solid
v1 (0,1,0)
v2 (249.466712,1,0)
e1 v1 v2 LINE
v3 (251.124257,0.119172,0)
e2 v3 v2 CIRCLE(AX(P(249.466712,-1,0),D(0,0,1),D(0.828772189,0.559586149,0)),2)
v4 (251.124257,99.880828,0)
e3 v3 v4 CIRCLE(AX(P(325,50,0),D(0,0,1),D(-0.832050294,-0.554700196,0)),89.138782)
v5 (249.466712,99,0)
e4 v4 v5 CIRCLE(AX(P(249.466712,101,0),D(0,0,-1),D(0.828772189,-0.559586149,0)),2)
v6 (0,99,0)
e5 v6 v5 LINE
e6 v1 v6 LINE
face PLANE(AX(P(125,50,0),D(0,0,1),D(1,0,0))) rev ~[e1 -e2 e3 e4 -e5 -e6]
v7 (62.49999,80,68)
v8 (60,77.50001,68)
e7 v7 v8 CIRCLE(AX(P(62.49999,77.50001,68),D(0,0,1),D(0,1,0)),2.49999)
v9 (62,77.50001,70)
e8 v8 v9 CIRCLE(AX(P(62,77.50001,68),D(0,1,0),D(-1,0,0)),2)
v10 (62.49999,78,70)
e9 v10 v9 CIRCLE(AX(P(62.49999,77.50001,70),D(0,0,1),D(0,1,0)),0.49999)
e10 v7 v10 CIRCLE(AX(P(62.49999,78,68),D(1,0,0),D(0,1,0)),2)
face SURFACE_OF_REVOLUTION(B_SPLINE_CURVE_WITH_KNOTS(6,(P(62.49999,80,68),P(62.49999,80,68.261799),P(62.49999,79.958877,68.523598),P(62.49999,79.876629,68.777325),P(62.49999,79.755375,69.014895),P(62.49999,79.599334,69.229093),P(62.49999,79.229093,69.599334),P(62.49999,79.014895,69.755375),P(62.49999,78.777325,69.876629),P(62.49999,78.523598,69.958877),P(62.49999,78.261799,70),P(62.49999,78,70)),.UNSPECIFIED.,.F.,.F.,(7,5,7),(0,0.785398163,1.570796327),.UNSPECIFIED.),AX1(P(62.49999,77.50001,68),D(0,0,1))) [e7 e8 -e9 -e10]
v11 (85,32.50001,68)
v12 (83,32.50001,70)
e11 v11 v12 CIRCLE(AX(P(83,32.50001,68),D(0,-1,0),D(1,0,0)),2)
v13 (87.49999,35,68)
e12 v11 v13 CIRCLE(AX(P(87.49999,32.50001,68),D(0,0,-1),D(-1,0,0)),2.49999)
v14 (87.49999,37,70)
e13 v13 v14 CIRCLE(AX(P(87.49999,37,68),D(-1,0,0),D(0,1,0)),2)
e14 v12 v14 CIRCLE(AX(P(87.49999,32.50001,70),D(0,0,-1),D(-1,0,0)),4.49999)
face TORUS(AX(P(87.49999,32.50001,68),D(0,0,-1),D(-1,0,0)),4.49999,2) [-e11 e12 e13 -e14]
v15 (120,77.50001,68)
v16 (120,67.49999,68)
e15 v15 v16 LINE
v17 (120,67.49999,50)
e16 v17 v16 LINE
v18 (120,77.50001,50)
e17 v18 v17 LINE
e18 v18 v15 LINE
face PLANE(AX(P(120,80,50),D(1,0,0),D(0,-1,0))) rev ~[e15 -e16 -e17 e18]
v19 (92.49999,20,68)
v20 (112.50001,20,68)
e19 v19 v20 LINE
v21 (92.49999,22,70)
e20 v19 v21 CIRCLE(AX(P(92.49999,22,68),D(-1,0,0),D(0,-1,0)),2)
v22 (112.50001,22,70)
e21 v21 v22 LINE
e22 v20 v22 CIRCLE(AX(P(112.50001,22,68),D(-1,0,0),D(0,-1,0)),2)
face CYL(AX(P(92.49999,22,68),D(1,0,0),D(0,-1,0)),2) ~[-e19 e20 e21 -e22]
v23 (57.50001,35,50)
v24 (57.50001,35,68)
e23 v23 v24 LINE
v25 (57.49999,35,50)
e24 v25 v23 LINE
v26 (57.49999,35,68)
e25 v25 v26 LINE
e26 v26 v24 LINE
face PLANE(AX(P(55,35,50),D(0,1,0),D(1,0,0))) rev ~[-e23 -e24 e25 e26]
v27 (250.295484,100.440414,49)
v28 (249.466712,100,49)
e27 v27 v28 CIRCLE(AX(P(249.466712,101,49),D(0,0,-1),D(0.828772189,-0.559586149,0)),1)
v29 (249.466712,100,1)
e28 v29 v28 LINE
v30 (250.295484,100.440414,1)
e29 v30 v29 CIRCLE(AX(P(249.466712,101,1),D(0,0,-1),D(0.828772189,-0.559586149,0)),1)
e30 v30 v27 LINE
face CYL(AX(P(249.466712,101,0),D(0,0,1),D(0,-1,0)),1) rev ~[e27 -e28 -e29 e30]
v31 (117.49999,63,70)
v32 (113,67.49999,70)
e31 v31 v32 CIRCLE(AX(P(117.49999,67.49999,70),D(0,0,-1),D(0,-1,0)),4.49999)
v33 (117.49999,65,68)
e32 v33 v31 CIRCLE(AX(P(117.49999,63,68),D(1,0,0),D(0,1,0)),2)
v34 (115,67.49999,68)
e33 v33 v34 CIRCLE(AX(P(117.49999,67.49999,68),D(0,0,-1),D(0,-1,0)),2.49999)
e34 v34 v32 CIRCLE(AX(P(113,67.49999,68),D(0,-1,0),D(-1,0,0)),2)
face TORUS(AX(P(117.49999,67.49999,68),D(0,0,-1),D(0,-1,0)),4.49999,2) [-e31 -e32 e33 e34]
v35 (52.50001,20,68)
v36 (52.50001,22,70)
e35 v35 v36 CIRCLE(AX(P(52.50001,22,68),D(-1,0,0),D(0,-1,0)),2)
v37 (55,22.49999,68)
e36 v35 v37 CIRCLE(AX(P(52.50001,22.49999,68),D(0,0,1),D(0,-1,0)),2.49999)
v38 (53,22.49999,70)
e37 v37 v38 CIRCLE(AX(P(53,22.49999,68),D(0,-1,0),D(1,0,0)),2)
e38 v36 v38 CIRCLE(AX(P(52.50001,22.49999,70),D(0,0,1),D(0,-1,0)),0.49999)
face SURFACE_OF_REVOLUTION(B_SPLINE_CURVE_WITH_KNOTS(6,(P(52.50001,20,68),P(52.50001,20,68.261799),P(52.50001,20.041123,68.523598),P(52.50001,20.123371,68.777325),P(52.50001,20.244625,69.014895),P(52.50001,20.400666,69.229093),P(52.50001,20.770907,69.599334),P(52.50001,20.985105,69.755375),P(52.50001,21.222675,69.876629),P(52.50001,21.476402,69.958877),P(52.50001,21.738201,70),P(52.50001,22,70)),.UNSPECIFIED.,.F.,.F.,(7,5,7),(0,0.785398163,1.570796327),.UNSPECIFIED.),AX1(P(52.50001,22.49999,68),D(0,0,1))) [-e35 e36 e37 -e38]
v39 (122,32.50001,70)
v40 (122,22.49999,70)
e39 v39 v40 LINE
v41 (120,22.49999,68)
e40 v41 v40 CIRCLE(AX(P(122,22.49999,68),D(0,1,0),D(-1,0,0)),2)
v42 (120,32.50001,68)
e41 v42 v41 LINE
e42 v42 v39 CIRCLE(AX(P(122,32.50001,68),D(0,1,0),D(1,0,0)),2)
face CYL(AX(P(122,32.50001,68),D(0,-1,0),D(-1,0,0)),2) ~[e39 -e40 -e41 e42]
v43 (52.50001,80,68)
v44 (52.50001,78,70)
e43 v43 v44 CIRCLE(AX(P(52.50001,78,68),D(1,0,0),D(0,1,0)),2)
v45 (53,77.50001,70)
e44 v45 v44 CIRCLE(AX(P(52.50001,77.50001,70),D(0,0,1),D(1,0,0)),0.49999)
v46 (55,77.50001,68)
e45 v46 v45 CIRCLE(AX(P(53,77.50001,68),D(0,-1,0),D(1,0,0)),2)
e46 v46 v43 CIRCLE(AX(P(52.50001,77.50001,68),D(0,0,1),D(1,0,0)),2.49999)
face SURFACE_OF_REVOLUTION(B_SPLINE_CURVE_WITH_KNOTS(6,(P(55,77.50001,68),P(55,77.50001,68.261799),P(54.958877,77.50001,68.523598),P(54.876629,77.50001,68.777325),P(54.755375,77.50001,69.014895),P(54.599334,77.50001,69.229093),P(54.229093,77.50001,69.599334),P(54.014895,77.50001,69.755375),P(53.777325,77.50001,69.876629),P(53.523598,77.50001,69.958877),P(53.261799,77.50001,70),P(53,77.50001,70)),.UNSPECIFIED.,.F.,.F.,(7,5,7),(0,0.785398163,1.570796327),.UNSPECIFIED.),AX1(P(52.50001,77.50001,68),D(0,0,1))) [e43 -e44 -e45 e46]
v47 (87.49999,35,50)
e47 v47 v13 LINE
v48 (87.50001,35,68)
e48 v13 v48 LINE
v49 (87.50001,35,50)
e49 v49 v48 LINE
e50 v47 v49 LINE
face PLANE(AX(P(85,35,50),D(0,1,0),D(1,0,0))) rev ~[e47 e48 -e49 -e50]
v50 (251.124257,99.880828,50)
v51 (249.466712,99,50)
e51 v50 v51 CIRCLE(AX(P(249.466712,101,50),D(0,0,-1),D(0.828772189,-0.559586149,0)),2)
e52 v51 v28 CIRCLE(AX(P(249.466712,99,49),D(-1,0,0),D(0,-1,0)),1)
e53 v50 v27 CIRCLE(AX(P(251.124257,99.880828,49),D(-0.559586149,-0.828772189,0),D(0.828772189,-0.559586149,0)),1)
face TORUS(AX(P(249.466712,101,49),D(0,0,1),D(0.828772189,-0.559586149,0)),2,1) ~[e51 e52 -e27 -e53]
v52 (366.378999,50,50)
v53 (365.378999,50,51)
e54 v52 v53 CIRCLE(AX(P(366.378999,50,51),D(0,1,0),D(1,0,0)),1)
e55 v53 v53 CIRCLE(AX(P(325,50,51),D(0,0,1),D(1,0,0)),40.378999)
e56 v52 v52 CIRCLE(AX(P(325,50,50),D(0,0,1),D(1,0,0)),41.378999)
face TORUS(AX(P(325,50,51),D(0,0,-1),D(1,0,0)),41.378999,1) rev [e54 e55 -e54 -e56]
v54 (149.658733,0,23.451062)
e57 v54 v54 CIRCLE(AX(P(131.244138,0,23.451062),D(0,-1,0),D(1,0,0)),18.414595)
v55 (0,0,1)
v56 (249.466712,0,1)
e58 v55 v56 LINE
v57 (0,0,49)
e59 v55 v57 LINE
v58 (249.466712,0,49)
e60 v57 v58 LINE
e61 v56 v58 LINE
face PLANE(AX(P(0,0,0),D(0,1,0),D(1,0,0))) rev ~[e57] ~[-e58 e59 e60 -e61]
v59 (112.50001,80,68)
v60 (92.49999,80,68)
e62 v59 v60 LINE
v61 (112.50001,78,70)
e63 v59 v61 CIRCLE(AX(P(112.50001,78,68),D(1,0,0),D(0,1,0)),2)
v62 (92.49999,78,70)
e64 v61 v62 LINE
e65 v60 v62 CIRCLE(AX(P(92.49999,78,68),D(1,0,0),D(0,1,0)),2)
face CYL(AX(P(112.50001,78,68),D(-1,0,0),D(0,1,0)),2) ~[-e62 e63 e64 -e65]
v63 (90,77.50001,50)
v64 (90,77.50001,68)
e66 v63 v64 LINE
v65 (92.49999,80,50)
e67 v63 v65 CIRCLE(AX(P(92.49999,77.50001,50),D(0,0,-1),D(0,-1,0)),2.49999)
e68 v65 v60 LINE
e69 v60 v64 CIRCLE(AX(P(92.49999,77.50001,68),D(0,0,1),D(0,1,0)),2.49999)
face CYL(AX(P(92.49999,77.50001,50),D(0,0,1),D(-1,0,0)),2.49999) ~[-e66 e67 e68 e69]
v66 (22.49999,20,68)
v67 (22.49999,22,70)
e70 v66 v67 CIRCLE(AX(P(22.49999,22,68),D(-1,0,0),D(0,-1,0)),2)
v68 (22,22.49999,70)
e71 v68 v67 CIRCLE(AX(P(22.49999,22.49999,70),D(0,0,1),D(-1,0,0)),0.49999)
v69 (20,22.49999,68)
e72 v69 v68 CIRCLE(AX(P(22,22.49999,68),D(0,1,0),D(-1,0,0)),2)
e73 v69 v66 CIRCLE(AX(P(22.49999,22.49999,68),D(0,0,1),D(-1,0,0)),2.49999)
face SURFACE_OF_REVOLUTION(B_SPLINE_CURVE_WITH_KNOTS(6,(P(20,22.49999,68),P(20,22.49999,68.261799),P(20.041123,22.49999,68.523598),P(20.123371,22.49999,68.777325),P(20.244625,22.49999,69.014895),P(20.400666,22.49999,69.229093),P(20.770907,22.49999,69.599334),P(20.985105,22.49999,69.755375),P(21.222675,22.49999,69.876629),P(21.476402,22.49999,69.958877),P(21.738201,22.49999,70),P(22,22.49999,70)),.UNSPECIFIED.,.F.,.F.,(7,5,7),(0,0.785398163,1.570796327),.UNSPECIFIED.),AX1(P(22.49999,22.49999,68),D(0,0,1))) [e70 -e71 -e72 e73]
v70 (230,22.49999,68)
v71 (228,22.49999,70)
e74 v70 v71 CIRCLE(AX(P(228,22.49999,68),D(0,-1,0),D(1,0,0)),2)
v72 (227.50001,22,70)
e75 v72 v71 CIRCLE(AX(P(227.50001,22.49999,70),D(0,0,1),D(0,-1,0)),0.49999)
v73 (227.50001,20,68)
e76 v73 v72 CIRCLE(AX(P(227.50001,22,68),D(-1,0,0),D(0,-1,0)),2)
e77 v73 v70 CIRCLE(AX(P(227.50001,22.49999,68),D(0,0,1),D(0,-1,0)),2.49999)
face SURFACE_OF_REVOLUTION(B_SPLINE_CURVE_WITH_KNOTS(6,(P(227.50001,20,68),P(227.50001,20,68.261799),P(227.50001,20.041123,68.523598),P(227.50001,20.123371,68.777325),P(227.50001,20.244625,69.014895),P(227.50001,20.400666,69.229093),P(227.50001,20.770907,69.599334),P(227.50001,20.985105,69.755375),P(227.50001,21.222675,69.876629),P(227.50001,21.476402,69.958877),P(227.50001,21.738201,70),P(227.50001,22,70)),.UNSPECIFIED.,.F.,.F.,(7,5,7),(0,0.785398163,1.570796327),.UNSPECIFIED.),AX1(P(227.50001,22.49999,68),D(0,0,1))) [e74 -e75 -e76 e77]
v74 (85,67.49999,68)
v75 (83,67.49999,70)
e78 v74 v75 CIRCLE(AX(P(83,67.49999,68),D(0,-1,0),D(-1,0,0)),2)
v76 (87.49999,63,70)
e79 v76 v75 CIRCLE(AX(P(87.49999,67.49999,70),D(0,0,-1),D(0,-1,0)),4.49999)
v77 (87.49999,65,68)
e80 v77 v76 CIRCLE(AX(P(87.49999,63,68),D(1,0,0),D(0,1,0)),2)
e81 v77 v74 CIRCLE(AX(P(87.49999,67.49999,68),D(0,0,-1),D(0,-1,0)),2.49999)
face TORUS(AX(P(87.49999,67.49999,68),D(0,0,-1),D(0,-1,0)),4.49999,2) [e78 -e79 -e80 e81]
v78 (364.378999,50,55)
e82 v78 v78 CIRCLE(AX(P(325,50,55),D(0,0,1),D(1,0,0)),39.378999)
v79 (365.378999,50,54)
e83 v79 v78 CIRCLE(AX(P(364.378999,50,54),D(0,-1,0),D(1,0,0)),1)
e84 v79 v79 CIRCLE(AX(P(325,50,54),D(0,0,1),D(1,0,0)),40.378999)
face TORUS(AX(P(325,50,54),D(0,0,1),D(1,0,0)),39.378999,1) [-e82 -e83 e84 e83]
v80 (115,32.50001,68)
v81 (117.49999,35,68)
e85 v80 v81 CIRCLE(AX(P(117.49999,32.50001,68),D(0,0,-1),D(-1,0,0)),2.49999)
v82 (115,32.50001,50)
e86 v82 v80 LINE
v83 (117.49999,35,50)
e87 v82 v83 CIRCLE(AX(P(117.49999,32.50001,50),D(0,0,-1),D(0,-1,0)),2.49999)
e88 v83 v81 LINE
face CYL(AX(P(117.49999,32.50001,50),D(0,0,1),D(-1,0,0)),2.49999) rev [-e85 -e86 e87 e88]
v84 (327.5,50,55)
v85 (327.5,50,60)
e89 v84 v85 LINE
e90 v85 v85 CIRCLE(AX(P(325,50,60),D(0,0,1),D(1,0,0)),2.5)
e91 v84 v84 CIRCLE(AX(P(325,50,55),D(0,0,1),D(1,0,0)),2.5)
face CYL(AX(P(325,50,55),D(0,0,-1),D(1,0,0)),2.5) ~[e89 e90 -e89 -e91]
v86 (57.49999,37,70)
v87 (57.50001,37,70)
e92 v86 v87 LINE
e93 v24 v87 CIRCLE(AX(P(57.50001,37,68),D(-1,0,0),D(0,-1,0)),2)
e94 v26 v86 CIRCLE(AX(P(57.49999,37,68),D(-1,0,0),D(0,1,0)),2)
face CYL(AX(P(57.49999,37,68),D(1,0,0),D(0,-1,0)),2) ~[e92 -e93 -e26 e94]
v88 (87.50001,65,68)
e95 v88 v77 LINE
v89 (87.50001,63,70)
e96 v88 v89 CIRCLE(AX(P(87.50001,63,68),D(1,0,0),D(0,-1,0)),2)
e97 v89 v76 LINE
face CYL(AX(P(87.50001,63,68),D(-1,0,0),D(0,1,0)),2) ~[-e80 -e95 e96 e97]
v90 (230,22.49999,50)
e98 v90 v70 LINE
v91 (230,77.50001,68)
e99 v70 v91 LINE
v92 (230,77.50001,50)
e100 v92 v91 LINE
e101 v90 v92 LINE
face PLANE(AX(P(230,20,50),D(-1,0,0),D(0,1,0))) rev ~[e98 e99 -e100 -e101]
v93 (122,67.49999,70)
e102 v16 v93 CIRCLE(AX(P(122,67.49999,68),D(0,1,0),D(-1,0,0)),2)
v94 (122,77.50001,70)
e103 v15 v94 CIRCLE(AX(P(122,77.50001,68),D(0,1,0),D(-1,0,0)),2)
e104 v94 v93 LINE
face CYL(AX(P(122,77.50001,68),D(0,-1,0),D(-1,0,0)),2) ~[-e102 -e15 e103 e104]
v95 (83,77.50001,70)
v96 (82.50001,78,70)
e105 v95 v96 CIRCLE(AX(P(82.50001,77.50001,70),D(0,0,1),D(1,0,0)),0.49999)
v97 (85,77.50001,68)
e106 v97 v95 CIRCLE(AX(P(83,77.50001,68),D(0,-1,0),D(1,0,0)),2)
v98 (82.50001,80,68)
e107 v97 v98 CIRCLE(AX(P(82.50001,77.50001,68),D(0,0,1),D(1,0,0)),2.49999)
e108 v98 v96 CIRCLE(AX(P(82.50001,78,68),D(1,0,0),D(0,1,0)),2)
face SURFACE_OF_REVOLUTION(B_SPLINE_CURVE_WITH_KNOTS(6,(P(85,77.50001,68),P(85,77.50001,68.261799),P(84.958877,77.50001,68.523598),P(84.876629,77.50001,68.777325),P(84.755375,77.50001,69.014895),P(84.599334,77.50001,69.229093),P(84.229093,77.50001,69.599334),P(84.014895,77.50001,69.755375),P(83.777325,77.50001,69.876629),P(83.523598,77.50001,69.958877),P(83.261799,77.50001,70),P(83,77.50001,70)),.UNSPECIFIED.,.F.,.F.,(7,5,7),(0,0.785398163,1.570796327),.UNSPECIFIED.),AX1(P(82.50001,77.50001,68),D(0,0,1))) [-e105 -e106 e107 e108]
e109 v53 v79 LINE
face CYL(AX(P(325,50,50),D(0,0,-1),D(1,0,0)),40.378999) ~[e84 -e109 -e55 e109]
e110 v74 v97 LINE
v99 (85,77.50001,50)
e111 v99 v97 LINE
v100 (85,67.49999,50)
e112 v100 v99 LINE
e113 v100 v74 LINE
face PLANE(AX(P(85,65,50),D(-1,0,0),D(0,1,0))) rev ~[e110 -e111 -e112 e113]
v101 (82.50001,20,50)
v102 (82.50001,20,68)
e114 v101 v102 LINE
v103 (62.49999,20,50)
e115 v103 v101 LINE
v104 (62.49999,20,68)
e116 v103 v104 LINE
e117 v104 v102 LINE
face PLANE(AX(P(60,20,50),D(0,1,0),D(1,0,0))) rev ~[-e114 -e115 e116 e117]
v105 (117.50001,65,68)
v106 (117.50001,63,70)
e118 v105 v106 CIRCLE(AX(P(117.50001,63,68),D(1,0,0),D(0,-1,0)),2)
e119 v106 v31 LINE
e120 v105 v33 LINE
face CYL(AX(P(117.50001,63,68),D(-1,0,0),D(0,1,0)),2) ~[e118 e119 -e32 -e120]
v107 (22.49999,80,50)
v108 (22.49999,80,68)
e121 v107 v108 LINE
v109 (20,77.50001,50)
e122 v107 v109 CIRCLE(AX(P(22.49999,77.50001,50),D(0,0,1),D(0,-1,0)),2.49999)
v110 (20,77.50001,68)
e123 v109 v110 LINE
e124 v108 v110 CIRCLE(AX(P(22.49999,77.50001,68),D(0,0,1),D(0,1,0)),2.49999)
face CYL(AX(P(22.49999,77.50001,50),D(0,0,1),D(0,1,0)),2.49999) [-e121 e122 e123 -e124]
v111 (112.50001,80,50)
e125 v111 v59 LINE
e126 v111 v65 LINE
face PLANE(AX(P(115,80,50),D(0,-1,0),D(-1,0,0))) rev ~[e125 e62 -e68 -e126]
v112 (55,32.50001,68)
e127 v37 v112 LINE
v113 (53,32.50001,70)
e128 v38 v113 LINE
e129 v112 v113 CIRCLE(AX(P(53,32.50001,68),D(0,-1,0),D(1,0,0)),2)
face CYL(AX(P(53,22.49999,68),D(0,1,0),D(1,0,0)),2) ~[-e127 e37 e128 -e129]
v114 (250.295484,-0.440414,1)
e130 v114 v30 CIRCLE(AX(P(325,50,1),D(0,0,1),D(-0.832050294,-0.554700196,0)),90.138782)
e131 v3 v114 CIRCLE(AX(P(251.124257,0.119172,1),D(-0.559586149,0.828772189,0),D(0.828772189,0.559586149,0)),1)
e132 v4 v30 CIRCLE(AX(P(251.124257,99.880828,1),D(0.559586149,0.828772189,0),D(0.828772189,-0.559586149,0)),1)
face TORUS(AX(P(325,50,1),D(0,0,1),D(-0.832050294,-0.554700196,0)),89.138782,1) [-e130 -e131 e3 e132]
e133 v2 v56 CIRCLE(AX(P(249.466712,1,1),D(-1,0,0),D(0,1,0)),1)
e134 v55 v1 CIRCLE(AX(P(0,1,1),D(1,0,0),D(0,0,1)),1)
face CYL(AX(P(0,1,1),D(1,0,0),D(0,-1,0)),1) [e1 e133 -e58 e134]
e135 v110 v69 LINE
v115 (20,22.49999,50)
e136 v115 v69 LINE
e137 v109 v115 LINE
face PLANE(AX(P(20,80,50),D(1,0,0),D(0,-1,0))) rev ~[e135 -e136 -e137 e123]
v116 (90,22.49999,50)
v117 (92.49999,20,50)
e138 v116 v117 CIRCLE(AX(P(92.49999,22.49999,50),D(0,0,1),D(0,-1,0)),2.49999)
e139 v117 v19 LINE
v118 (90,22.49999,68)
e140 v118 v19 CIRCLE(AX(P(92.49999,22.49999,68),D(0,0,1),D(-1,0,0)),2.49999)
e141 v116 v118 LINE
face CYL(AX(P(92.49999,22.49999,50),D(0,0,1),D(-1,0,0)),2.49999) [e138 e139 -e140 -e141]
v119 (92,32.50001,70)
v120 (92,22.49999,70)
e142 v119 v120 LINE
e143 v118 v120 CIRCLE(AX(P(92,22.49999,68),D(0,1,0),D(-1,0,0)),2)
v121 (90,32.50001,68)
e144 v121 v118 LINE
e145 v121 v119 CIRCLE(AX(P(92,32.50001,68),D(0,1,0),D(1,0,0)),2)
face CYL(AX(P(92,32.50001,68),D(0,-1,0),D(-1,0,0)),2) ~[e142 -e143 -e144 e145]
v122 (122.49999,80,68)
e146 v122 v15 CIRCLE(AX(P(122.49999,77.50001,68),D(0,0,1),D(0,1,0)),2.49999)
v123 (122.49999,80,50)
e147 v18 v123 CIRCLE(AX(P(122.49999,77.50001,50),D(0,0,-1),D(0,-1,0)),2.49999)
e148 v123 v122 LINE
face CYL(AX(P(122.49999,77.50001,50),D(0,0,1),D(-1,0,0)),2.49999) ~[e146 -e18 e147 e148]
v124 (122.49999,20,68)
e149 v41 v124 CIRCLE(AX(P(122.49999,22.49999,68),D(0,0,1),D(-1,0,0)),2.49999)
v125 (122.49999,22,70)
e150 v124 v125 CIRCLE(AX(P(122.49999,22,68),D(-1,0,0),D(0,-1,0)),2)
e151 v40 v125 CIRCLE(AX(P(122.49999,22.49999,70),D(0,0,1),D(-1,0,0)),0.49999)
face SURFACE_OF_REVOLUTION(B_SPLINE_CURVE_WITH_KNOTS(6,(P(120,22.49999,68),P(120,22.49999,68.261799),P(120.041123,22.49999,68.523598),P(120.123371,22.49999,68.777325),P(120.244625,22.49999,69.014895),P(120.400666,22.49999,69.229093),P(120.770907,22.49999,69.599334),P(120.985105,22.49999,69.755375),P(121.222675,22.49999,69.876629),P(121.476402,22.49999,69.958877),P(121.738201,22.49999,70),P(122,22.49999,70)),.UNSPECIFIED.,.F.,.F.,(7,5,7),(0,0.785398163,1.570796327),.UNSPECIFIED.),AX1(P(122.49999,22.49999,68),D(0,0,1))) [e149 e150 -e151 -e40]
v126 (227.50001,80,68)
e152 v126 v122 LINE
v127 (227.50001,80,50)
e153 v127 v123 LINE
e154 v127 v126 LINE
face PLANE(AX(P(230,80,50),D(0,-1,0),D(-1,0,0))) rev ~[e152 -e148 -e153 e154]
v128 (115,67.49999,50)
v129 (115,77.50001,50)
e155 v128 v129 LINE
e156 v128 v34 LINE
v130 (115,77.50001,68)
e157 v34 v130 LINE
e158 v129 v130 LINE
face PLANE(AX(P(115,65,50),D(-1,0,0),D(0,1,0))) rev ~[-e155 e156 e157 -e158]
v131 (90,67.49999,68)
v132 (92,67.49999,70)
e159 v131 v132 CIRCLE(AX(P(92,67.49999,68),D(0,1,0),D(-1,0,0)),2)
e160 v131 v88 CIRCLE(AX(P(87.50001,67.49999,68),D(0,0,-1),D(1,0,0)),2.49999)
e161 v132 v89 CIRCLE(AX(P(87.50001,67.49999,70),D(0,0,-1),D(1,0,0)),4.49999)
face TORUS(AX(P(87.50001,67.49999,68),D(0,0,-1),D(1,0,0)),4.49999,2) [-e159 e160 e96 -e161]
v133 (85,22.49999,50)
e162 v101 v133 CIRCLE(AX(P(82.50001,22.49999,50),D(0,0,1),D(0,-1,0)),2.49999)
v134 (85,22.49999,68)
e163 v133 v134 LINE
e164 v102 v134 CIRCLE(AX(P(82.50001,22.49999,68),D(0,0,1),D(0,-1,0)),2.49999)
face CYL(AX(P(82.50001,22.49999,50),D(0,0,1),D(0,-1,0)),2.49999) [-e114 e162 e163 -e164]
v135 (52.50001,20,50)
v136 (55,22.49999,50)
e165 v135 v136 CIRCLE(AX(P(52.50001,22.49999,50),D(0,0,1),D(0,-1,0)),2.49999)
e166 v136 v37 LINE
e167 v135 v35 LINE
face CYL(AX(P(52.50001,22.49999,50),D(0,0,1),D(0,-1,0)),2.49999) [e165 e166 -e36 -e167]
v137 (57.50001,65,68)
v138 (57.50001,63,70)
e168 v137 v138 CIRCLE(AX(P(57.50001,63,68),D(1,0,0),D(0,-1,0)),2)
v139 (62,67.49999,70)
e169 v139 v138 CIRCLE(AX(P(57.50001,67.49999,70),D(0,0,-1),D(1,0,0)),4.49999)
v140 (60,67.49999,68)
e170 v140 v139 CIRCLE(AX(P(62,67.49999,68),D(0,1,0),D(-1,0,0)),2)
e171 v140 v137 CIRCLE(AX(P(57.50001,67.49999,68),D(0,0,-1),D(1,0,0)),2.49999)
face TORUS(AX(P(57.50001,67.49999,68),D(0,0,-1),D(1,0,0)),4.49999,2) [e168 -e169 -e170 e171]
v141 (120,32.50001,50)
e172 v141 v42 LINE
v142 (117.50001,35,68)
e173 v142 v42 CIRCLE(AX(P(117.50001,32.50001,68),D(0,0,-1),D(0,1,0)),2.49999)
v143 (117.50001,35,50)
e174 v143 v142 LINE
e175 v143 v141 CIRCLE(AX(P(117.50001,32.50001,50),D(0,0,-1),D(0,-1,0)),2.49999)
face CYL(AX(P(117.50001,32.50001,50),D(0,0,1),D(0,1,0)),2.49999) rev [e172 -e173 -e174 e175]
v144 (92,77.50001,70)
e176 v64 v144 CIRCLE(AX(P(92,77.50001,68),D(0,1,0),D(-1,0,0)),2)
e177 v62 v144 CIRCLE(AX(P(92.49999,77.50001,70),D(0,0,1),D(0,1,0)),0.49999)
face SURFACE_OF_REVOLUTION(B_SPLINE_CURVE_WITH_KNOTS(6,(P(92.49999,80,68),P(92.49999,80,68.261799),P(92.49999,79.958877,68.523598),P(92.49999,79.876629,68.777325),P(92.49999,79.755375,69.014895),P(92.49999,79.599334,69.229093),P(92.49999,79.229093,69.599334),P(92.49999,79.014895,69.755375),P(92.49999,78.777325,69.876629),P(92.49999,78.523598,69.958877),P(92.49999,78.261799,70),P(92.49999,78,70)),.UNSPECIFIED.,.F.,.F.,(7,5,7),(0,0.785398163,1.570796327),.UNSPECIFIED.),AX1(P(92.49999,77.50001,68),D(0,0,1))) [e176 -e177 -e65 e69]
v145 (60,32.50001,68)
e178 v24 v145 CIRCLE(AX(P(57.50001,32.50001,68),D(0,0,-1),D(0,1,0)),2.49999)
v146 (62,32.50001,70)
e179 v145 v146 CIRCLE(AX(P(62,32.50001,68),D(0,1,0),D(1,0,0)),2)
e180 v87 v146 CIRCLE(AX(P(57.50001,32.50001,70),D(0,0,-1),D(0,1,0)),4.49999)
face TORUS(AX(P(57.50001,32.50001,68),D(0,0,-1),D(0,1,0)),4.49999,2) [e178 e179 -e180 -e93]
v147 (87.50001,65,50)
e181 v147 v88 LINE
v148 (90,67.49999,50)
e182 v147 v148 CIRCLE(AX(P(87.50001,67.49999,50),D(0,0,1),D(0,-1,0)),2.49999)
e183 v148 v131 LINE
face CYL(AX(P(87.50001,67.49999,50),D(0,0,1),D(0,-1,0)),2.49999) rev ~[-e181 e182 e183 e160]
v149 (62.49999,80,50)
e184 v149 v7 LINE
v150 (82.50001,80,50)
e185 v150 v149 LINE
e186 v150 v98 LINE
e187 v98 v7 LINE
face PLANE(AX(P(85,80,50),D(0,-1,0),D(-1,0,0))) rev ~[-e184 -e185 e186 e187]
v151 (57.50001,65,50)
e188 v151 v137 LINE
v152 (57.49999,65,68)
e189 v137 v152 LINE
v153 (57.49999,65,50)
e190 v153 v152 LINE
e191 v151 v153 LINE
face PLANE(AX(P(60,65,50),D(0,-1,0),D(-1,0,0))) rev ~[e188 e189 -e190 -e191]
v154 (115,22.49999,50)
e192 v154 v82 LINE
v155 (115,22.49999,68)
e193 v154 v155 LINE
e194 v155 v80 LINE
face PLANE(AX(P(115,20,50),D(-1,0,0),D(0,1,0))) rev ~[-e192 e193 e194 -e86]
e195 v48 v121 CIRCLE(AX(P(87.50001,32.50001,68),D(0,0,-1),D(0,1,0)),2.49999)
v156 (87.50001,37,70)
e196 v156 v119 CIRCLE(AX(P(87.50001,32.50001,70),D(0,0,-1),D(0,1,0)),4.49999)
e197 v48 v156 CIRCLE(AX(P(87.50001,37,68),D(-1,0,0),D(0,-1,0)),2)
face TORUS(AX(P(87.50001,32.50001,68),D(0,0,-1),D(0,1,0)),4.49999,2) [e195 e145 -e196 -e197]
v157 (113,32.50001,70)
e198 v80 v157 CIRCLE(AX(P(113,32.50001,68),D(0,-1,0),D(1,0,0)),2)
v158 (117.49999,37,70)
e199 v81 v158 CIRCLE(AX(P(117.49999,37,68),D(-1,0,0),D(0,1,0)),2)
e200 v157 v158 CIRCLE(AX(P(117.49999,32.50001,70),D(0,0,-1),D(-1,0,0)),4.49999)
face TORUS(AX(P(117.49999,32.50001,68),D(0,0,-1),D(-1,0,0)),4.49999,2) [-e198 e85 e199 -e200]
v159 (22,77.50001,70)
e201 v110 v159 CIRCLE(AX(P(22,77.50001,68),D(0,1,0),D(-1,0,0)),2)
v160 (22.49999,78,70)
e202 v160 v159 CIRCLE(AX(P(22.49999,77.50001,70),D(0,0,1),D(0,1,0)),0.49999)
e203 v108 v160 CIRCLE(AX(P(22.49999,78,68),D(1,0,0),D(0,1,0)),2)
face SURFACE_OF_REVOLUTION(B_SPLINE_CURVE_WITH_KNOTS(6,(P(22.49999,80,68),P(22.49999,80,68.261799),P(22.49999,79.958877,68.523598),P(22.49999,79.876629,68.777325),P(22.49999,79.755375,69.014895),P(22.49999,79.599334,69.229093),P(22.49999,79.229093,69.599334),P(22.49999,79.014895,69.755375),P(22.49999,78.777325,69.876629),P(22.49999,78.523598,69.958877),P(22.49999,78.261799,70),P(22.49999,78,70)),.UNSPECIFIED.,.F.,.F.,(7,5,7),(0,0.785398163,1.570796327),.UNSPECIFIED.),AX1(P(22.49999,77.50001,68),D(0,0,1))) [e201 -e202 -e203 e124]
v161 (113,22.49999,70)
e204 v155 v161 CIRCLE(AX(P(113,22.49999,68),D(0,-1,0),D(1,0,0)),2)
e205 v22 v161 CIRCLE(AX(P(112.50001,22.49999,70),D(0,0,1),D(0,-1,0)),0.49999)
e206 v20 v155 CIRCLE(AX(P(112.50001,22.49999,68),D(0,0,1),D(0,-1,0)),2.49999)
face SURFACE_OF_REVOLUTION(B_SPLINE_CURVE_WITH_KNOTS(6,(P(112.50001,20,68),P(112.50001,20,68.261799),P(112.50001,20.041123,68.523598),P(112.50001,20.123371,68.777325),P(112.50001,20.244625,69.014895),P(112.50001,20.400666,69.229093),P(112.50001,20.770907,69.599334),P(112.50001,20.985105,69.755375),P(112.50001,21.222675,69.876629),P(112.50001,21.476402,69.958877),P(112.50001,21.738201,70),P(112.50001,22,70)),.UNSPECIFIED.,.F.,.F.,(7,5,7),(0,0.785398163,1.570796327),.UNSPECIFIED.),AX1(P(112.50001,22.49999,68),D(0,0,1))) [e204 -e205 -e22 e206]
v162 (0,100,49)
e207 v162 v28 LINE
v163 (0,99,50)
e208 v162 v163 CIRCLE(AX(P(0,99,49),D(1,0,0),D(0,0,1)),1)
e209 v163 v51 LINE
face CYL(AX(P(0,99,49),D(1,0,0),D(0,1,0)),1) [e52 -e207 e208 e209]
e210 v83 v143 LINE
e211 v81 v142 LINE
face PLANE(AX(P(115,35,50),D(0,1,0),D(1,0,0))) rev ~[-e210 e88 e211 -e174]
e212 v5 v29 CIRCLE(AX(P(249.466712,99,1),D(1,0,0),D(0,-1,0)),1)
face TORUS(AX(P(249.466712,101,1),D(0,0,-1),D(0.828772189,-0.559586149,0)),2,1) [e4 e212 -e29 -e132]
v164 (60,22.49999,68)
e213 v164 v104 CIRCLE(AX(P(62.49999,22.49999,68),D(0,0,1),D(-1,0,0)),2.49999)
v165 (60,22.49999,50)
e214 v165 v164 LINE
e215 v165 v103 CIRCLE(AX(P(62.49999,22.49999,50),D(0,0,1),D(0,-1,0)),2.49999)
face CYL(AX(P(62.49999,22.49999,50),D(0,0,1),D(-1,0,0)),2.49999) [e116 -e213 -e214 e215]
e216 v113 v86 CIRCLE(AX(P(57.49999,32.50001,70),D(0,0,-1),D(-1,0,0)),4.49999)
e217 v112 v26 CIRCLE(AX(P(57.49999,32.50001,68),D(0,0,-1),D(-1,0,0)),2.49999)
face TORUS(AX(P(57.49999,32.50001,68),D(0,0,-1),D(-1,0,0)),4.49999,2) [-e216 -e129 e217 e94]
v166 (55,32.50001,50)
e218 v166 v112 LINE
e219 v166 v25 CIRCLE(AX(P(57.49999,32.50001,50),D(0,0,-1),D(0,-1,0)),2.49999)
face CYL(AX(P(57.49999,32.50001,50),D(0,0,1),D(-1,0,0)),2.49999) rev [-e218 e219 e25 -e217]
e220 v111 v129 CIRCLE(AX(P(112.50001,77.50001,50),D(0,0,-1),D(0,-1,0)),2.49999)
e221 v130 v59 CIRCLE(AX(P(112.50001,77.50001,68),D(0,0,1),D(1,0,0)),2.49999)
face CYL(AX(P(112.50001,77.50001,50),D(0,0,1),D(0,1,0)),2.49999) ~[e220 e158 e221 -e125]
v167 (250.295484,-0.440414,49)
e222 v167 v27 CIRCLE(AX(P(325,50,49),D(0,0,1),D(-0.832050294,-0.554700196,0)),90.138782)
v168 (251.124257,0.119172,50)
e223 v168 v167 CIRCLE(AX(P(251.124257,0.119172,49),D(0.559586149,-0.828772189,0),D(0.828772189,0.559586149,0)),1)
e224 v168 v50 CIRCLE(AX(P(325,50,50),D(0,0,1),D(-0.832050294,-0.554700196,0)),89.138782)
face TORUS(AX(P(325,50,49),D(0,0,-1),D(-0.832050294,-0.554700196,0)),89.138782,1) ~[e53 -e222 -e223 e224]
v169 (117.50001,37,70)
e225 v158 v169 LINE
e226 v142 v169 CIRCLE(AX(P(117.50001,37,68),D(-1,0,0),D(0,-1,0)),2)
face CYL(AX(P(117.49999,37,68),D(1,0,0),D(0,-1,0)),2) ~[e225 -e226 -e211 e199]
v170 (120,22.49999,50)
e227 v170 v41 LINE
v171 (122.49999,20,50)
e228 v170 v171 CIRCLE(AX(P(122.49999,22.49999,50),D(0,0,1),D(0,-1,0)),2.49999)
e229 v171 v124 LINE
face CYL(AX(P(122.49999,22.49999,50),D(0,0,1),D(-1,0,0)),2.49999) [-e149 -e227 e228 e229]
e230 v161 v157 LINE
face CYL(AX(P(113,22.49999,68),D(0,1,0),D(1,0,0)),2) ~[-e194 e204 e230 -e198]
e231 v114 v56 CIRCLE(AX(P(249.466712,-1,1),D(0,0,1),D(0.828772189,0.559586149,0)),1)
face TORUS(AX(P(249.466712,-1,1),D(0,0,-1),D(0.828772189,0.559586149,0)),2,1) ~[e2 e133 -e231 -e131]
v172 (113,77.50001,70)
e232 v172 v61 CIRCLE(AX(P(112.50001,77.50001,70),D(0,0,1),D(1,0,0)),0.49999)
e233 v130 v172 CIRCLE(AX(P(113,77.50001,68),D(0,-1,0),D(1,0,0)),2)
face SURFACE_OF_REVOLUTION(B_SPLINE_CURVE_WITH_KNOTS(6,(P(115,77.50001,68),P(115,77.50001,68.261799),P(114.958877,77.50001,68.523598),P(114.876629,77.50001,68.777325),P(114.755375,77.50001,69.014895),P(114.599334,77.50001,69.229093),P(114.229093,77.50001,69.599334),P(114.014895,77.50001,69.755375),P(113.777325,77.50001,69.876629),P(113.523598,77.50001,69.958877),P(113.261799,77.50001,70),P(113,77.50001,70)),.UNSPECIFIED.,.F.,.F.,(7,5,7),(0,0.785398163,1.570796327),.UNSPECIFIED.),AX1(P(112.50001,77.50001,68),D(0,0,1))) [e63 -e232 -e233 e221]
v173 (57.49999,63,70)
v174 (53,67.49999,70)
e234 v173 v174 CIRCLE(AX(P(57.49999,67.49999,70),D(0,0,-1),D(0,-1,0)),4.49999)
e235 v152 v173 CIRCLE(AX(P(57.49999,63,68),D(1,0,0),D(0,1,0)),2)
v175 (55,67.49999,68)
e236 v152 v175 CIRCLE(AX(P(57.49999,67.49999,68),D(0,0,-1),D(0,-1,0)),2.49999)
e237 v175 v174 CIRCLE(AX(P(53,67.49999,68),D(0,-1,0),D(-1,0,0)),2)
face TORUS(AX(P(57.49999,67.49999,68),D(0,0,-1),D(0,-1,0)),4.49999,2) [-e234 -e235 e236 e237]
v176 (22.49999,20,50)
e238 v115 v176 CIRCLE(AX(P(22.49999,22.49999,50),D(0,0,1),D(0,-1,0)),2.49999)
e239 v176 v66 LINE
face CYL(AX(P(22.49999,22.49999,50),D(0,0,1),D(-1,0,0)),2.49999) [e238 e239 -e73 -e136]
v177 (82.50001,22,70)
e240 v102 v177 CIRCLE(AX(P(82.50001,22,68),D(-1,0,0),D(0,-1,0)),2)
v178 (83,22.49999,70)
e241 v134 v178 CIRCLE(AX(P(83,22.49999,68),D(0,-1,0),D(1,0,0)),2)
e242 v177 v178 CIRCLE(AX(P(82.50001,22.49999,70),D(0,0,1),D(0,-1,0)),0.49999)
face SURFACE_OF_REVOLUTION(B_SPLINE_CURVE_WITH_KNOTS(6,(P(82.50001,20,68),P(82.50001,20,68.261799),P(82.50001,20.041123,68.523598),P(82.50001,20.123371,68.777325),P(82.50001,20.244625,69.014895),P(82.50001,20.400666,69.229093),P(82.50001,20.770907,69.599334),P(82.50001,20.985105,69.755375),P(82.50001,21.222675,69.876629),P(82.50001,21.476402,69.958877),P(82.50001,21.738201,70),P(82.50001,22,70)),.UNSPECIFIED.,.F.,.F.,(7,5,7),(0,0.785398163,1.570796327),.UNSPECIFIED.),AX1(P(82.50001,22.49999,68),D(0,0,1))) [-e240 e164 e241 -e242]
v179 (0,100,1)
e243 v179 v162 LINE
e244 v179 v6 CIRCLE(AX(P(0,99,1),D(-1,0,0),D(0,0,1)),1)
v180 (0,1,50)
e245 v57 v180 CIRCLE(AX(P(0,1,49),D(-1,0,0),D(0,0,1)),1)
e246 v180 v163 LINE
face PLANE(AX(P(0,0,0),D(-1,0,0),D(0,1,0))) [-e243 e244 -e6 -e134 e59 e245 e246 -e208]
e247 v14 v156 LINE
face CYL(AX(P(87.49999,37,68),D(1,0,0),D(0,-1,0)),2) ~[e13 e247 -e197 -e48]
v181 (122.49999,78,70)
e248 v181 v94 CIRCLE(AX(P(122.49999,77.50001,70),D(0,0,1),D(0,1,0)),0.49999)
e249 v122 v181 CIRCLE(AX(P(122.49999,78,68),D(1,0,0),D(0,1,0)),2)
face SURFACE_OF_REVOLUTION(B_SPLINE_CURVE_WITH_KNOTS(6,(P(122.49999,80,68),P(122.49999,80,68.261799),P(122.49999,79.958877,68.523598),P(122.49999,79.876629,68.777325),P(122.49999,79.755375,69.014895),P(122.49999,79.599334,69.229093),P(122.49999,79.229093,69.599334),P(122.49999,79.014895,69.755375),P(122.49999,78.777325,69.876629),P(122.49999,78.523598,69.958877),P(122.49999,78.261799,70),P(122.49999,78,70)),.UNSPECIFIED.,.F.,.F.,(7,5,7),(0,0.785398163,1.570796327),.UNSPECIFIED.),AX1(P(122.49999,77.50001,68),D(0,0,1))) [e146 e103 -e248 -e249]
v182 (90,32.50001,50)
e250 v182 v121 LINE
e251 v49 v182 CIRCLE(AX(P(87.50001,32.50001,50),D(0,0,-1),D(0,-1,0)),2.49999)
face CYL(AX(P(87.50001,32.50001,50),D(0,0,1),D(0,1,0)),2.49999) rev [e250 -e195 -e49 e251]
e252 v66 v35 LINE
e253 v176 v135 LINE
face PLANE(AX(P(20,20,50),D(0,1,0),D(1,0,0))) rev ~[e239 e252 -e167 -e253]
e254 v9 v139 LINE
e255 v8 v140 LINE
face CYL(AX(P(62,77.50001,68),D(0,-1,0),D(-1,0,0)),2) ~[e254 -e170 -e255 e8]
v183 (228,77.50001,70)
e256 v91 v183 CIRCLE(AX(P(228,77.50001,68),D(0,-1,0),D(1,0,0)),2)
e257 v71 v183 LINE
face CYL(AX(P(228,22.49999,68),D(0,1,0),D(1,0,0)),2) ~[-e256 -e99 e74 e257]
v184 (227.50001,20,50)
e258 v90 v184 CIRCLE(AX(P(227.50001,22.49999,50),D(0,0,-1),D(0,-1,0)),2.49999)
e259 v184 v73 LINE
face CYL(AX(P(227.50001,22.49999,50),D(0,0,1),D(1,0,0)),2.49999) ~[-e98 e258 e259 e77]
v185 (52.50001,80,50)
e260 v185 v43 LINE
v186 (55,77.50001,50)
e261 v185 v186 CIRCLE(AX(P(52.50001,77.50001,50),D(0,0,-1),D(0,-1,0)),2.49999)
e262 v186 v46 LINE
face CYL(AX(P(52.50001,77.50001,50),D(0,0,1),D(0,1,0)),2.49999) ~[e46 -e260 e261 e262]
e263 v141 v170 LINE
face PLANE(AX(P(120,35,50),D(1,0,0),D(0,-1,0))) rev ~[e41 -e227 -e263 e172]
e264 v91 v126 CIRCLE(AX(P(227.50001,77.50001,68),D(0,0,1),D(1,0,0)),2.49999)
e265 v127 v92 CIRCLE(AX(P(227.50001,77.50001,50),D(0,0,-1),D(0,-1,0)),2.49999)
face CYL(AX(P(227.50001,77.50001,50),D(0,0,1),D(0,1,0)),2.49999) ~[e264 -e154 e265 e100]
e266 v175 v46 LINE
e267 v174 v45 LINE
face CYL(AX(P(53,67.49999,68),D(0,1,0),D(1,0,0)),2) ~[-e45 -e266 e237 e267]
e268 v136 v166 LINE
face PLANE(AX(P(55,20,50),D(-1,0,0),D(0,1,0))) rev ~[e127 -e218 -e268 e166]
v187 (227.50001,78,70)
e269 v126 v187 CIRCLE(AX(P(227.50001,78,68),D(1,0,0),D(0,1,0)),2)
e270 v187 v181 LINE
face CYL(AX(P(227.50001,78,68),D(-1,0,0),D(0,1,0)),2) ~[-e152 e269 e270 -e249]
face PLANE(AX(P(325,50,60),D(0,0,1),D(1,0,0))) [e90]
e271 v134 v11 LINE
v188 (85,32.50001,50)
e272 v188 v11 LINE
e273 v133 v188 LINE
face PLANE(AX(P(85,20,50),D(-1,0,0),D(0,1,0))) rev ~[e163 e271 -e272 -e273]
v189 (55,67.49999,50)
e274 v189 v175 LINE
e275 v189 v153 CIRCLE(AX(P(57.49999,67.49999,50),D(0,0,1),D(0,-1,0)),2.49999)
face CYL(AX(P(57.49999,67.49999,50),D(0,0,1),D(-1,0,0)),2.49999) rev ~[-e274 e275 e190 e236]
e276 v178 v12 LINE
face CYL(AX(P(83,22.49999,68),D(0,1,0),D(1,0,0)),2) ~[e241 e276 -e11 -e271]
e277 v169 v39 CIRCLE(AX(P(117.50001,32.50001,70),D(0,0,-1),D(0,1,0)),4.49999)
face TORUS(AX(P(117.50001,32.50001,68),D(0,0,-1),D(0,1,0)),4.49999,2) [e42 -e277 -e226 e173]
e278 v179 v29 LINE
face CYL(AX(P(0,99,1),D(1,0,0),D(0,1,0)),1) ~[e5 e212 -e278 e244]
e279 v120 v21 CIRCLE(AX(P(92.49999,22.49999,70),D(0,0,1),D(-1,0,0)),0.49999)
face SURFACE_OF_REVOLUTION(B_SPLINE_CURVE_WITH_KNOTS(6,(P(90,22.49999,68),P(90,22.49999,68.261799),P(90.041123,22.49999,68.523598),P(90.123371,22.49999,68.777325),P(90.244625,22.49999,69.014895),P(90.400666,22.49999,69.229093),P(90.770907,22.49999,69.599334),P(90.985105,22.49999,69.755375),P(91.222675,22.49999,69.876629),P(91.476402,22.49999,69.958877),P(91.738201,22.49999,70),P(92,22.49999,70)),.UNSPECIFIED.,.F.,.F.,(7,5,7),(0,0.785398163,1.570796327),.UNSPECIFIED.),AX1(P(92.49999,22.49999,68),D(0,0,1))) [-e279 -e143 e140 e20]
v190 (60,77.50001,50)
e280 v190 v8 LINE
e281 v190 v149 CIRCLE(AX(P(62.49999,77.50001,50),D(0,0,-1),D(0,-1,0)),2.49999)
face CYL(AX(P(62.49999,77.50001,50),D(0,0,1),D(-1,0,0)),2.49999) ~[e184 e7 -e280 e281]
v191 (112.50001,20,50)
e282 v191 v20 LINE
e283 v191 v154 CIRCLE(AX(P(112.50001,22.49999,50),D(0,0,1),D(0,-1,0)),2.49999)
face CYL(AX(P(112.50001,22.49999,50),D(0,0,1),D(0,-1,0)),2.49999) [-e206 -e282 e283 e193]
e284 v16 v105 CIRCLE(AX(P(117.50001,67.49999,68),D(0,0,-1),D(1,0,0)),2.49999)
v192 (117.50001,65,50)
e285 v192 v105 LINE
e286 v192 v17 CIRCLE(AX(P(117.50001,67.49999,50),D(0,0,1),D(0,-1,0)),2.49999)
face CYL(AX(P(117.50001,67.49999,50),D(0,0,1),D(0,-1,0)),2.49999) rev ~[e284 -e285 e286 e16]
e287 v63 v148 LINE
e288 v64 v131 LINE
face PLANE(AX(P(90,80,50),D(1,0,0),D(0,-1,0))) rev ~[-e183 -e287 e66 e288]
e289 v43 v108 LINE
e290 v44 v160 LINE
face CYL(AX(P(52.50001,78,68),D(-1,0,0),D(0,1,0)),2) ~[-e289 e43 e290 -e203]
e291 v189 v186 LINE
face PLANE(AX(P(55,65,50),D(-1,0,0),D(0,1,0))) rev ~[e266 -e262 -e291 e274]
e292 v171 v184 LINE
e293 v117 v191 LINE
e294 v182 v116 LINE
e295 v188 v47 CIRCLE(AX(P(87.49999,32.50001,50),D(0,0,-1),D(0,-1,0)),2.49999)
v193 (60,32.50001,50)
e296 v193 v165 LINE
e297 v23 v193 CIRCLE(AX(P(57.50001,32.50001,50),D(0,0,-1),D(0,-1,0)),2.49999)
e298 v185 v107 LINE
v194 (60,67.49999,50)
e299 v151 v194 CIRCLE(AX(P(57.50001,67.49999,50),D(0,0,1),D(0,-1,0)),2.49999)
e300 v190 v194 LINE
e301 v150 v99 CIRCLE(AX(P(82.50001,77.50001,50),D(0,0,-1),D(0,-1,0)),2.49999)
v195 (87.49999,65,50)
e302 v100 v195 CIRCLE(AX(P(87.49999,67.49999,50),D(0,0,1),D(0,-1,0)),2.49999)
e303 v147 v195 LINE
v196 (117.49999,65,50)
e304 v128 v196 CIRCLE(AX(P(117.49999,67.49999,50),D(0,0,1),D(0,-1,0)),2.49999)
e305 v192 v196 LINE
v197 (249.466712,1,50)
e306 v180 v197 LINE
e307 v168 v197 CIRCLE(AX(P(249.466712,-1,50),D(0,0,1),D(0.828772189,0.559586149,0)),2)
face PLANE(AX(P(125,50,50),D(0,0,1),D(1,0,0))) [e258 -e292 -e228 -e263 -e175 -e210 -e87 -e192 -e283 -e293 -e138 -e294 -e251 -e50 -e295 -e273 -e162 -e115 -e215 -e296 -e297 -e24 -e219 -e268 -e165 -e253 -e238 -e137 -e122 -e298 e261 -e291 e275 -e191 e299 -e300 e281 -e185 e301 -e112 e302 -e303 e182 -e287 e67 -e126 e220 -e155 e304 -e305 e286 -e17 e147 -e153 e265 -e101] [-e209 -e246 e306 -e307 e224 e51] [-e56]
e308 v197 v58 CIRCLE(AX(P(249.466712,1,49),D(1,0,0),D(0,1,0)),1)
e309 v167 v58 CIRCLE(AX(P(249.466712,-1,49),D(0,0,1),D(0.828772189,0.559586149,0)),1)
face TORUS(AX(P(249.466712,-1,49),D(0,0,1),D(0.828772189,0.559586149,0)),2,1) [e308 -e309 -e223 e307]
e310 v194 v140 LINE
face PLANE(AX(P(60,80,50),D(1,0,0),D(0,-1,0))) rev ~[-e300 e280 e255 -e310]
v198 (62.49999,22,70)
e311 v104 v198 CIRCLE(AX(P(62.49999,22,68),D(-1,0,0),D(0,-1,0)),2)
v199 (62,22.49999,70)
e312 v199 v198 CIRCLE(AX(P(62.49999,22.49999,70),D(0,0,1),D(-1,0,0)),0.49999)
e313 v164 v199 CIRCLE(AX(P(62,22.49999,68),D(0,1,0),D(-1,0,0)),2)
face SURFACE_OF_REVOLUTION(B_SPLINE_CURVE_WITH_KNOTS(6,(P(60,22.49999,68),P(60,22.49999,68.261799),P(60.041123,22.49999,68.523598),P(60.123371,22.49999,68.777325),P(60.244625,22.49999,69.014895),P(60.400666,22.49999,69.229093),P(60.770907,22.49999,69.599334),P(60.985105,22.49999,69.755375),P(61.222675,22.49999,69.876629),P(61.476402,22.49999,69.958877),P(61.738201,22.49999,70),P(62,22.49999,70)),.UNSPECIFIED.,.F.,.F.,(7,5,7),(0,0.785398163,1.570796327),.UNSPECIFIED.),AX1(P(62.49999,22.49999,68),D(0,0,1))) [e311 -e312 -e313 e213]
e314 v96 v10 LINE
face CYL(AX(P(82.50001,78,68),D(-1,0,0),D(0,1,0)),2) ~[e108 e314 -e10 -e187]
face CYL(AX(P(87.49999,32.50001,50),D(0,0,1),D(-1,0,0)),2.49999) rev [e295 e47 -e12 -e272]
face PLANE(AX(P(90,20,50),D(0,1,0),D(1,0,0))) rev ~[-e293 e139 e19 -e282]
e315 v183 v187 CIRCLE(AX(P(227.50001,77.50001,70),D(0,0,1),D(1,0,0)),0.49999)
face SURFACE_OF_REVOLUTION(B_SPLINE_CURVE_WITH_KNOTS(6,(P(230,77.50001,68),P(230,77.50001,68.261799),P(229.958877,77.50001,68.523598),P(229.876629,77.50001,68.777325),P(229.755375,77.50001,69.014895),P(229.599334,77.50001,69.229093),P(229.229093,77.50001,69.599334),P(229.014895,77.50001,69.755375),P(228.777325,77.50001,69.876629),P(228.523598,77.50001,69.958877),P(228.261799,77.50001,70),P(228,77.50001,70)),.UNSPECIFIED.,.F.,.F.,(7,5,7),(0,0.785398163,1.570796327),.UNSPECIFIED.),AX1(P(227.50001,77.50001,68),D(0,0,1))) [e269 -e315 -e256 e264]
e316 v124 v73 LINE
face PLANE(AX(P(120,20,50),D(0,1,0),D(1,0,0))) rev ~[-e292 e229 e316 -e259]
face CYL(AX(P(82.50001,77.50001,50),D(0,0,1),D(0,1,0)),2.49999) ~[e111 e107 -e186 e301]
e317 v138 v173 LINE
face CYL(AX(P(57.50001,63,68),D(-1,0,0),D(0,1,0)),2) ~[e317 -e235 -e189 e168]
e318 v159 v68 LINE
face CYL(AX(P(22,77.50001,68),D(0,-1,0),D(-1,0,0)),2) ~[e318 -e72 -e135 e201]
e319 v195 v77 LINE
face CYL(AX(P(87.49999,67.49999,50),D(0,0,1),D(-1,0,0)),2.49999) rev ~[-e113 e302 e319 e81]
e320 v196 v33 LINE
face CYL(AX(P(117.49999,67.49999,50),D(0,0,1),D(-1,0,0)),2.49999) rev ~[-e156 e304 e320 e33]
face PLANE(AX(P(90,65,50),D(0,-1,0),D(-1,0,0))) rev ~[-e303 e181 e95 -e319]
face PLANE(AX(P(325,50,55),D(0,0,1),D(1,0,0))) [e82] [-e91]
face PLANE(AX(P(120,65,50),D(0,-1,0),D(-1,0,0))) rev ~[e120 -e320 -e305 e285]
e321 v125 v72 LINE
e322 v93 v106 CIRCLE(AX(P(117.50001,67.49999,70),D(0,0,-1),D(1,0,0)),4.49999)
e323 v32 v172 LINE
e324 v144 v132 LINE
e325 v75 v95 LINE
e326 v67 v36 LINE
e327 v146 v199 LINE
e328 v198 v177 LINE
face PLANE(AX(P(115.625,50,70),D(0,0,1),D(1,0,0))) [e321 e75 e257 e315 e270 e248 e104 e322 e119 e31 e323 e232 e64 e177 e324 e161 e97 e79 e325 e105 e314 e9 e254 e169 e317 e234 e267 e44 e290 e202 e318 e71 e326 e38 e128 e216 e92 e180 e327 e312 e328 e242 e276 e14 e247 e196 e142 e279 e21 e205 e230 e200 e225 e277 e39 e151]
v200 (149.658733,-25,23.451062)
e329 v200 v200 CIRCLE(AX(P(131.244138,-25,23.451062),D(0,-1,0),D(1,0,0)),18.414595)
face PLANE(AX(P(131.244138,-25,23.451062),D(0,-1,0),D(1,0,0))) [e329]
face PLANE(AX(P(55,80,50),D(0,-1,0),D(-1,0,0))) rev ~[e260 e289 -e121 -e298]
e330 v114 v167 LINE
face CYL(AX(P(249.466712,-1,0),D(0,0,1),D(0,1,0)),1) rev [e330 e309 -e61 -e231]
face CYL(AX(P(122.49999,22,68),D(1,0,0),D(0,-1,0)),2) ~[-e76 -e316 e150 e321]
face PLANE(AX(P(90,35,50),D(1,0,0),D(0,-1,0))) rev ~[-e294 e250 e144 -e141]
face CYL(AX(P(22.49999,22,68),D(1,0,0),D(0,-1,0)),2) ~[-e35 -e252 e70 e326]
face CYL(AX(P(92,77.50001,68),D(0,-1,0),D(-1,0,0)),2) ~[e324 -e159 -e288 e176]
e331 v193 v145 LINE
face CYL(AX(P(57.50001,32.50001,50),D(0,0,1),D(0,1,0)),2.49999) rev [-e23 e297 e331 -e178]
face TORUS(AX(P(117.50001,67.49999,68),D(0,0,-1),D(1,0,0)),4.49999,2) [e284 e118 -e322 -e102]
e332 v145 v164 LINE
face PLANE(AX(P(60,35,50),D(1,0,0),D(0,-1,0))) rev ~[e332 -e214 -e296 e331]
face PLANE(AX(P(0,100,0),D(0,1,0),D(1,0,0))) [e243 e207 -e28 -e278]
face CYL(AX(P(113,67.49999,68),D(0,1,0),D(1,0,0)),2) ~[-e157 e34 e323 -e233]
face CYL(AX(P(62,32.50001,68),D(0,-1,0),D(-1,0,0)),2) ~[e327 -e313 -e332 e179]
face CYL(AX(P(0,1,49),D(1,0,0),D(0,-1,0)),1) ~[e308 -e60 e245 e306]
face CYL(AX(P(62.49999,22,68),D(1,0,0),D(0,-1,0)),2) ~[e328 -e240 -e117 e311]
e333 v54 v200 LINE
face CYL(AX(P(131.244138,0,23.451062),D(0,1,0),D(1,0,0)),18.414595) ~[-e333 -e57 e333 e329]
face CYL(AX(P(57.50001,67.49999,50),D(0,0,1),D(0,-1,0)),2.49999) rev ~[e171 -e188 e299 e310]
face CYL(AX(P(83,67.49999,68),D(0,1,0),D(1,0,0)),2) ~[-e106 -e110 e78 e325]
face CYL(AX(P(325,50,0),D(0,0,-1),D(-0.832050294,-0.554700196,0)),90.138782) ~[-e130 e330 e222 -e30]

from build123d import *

# Parameters (mm, degrees)
F0_W      = 250
F0_H      = 100
F1_DEPTH  = 50
F3_DEPTH  = 20
F4_R      = 40.3789988007
F5_DEPTH  = 5
F6_R      = 2.5
F7_DEPTH  = 5
F8_R      = 1
F9_R      = 2.49999
F10_R     = 2
F11_R     = 18.4145954801
F12_DEPTH = 25


# Not quite as in the source:
# - a fillet or chamfer is up to 0.001 mm smaller than in the source, because OpenCascade refuses the exact size
# - a feature of the source that left no trace in its solid (it failed there, or was rolled back) is left out


with BuildPart() as f1:
    # F0 (on Top) → F1 (new body)
    with BuildSketch(Plane.XY):
        with Locations((125, 50)):
            Rectangle(F0_W, F0_H)
        with BuildLine():
            Line((250, 100), (250, 0))
            ThreePointArc((250, 0), (415.1387818866, 50), (250, 100))
        make_face()
    extrude(amount=F1_DEPTH)

    # F2 (on face) → F3 (join)
    with BuildSketch(Plane.XY.offset(50)):
        Polygon((55, 80), (20, 80), (20, 20), (55, 20), (55, 35), (60, 35), (60, 20), (85, 20), (85, 35), (90, 35), (90, 20), (115, 20), (115, 35), (120, 35), (120, 20), (230, 20), (230, 80), (120, 80), (120, 65), (115, 65), (115, 80), (90, 80), (90, 65), (85, 65), (85, 80), (60, 80), (60, 65), (55, 65), align=None)
    extrude(amount=F3_DEPTH)

    # F4 (on face) → F5 (join)
    with BuildSketch(Plane.XY.offset(50)):
        with Locations((325, 50)):
            Circle(F4_R)
    extrude(amount=F5_DEPTH)

    # F6 (on face) → F7 (join)
    with BuildSketch(Plane.XY.offset(55)):
        with Locations((325, 50)):
            Circle(F6_R)
    extrude(amount=F7_DEPTH)

    # F8
    f8_edges = [f1.edges().sort_by_distance(p)[0] for p in [
        (250, 0, 25),
        (250, 100, 25),
        (415.138782, 50, 0),
        (415.138782, 50, 50),
        (284.621001, 50, 55),
        (284.621001, 50, 50),
        (125, 100, 0),
        (125, 100, 50),
        (125, 0, 0),
        (125, 0, 50),
    ]]
    fillet(f8_edges, radius=F8_R)

    # F9 (radius 2.5 in the source; OpenCascade refuses exactly that, so slightly less here)
    f9_edges = [f1.edges().sort_by_distance(p)[0] for p in [
        (55, 35, 60),
        (55, 20, 60),
        (60, 35, 60),
        (60, 20, 60),
        (85, 20, 60),
        (90, 35, 60),
        (90, 20, 60),
        (115, 20, 60),
        (120, 35, 60),
        (120, 20, 60),
        (85, 35, 60),
        (115, 35, 60),
        (55, 65, 60),
        (55, 80, 60),
        (85, 65, 60),
        (85, 80, 60),
        (115, 65, 60),
        (115, 80, 60),
        (60, 65, 60),
        (60, 80, 60),
        (90, 65, 60),
        (90, 80, 60),
        (120, 65, 60),
        (120, 80, 60),
        (20, 80, 60),
        (20, 20, 60),
        (230, 80, 60),
        (230, 20, 60),
    ]]
    fillet(f9_edges, radius=F9_R)

    # F10
    f10_edges = [f1.edges().sort_by_distance(p)[0] for p in [
        (175, 80, 70),
        (230, 50, 70),
        (37.5, 80, 70),
        (54.26777, 79.26777, 70),
        (20.73223, 79.26777, 70),
        (55, 72.5, 70),
        (20, 50, 70),
        (55.73223, 65.73223, 70),
        (20.73223, 20.73223, 70),
        (57.5, 65, 70),
        (37.5, 20, 70),
        (59.26777, 65.73223, 70),
        (54.26777, 20.73223, 70),
        (60, 72.5, 70),
        (55, 27.5, 70),
        (60.73223, 79.26777, 70),
        (55.73223, 34.26777, 70),
        (72.5, 80, 70),
        (57.5, 35, 70),
        (84.26777, 79.26777, 70),
        (59.26777, 34.26777, 70),
        (85, 72.5, 70),
        (60, 27.5, 70),
        (85.73223, 65.73223, 70),
        (60.73223, 20.73223, 70),
        (87.5, 65, 70),
        (72.5, 20, 70),
        (89.26777, 65.73223, 70),
        (84.26777, 20.73223, 70),
        (90, 72.5, 70),
        (85, 27.5, 70),
        (90.73223, 79.26777, 70),
        (85.73223, 34.26777, 70),
        (102.5, 80, 70),
        (87.5, 35, 70),
        (114.26777, 79.26777, 70),
        (89.26777, 34.26777, 70),
        (115, 72.5, 70),
        (90, 27.5, 70),
        (115.73223, 65.73223, 70),
        (90.73223, 20.73223, 70),
        (117.5, 65, 70),
        (102.5, 20, 70),
        (119.26777, 65.73223, 70),
        (114.26777, 20.73223, 70),
        (120, 72.5, 70),
        (115, 27.5, 70),
        (120.73223, 79.26777, 70),
        (115.73223, 34.26777, 70),
        (117.5, 35, 70),
        (229.26777, 79.26777, 70),
        (119.26777, 34.26777, 70),
        (120, 27.5, 70),
        (229.26777, 20.73223, 70),
        (120.73223, 20.73223, 70),
        (175, 20, 70),
    ]]
    fillet(f10_edges, radius=F10_R)

    # F11 (on face) → F12 (join)
    with BuildSketch(Plane.XZ):
        with Locations((131.2441378832, 23.4510619193)):
            Circle(F11_R)
    extrude(amount=F12_DEPTH)


solid = f1.part
